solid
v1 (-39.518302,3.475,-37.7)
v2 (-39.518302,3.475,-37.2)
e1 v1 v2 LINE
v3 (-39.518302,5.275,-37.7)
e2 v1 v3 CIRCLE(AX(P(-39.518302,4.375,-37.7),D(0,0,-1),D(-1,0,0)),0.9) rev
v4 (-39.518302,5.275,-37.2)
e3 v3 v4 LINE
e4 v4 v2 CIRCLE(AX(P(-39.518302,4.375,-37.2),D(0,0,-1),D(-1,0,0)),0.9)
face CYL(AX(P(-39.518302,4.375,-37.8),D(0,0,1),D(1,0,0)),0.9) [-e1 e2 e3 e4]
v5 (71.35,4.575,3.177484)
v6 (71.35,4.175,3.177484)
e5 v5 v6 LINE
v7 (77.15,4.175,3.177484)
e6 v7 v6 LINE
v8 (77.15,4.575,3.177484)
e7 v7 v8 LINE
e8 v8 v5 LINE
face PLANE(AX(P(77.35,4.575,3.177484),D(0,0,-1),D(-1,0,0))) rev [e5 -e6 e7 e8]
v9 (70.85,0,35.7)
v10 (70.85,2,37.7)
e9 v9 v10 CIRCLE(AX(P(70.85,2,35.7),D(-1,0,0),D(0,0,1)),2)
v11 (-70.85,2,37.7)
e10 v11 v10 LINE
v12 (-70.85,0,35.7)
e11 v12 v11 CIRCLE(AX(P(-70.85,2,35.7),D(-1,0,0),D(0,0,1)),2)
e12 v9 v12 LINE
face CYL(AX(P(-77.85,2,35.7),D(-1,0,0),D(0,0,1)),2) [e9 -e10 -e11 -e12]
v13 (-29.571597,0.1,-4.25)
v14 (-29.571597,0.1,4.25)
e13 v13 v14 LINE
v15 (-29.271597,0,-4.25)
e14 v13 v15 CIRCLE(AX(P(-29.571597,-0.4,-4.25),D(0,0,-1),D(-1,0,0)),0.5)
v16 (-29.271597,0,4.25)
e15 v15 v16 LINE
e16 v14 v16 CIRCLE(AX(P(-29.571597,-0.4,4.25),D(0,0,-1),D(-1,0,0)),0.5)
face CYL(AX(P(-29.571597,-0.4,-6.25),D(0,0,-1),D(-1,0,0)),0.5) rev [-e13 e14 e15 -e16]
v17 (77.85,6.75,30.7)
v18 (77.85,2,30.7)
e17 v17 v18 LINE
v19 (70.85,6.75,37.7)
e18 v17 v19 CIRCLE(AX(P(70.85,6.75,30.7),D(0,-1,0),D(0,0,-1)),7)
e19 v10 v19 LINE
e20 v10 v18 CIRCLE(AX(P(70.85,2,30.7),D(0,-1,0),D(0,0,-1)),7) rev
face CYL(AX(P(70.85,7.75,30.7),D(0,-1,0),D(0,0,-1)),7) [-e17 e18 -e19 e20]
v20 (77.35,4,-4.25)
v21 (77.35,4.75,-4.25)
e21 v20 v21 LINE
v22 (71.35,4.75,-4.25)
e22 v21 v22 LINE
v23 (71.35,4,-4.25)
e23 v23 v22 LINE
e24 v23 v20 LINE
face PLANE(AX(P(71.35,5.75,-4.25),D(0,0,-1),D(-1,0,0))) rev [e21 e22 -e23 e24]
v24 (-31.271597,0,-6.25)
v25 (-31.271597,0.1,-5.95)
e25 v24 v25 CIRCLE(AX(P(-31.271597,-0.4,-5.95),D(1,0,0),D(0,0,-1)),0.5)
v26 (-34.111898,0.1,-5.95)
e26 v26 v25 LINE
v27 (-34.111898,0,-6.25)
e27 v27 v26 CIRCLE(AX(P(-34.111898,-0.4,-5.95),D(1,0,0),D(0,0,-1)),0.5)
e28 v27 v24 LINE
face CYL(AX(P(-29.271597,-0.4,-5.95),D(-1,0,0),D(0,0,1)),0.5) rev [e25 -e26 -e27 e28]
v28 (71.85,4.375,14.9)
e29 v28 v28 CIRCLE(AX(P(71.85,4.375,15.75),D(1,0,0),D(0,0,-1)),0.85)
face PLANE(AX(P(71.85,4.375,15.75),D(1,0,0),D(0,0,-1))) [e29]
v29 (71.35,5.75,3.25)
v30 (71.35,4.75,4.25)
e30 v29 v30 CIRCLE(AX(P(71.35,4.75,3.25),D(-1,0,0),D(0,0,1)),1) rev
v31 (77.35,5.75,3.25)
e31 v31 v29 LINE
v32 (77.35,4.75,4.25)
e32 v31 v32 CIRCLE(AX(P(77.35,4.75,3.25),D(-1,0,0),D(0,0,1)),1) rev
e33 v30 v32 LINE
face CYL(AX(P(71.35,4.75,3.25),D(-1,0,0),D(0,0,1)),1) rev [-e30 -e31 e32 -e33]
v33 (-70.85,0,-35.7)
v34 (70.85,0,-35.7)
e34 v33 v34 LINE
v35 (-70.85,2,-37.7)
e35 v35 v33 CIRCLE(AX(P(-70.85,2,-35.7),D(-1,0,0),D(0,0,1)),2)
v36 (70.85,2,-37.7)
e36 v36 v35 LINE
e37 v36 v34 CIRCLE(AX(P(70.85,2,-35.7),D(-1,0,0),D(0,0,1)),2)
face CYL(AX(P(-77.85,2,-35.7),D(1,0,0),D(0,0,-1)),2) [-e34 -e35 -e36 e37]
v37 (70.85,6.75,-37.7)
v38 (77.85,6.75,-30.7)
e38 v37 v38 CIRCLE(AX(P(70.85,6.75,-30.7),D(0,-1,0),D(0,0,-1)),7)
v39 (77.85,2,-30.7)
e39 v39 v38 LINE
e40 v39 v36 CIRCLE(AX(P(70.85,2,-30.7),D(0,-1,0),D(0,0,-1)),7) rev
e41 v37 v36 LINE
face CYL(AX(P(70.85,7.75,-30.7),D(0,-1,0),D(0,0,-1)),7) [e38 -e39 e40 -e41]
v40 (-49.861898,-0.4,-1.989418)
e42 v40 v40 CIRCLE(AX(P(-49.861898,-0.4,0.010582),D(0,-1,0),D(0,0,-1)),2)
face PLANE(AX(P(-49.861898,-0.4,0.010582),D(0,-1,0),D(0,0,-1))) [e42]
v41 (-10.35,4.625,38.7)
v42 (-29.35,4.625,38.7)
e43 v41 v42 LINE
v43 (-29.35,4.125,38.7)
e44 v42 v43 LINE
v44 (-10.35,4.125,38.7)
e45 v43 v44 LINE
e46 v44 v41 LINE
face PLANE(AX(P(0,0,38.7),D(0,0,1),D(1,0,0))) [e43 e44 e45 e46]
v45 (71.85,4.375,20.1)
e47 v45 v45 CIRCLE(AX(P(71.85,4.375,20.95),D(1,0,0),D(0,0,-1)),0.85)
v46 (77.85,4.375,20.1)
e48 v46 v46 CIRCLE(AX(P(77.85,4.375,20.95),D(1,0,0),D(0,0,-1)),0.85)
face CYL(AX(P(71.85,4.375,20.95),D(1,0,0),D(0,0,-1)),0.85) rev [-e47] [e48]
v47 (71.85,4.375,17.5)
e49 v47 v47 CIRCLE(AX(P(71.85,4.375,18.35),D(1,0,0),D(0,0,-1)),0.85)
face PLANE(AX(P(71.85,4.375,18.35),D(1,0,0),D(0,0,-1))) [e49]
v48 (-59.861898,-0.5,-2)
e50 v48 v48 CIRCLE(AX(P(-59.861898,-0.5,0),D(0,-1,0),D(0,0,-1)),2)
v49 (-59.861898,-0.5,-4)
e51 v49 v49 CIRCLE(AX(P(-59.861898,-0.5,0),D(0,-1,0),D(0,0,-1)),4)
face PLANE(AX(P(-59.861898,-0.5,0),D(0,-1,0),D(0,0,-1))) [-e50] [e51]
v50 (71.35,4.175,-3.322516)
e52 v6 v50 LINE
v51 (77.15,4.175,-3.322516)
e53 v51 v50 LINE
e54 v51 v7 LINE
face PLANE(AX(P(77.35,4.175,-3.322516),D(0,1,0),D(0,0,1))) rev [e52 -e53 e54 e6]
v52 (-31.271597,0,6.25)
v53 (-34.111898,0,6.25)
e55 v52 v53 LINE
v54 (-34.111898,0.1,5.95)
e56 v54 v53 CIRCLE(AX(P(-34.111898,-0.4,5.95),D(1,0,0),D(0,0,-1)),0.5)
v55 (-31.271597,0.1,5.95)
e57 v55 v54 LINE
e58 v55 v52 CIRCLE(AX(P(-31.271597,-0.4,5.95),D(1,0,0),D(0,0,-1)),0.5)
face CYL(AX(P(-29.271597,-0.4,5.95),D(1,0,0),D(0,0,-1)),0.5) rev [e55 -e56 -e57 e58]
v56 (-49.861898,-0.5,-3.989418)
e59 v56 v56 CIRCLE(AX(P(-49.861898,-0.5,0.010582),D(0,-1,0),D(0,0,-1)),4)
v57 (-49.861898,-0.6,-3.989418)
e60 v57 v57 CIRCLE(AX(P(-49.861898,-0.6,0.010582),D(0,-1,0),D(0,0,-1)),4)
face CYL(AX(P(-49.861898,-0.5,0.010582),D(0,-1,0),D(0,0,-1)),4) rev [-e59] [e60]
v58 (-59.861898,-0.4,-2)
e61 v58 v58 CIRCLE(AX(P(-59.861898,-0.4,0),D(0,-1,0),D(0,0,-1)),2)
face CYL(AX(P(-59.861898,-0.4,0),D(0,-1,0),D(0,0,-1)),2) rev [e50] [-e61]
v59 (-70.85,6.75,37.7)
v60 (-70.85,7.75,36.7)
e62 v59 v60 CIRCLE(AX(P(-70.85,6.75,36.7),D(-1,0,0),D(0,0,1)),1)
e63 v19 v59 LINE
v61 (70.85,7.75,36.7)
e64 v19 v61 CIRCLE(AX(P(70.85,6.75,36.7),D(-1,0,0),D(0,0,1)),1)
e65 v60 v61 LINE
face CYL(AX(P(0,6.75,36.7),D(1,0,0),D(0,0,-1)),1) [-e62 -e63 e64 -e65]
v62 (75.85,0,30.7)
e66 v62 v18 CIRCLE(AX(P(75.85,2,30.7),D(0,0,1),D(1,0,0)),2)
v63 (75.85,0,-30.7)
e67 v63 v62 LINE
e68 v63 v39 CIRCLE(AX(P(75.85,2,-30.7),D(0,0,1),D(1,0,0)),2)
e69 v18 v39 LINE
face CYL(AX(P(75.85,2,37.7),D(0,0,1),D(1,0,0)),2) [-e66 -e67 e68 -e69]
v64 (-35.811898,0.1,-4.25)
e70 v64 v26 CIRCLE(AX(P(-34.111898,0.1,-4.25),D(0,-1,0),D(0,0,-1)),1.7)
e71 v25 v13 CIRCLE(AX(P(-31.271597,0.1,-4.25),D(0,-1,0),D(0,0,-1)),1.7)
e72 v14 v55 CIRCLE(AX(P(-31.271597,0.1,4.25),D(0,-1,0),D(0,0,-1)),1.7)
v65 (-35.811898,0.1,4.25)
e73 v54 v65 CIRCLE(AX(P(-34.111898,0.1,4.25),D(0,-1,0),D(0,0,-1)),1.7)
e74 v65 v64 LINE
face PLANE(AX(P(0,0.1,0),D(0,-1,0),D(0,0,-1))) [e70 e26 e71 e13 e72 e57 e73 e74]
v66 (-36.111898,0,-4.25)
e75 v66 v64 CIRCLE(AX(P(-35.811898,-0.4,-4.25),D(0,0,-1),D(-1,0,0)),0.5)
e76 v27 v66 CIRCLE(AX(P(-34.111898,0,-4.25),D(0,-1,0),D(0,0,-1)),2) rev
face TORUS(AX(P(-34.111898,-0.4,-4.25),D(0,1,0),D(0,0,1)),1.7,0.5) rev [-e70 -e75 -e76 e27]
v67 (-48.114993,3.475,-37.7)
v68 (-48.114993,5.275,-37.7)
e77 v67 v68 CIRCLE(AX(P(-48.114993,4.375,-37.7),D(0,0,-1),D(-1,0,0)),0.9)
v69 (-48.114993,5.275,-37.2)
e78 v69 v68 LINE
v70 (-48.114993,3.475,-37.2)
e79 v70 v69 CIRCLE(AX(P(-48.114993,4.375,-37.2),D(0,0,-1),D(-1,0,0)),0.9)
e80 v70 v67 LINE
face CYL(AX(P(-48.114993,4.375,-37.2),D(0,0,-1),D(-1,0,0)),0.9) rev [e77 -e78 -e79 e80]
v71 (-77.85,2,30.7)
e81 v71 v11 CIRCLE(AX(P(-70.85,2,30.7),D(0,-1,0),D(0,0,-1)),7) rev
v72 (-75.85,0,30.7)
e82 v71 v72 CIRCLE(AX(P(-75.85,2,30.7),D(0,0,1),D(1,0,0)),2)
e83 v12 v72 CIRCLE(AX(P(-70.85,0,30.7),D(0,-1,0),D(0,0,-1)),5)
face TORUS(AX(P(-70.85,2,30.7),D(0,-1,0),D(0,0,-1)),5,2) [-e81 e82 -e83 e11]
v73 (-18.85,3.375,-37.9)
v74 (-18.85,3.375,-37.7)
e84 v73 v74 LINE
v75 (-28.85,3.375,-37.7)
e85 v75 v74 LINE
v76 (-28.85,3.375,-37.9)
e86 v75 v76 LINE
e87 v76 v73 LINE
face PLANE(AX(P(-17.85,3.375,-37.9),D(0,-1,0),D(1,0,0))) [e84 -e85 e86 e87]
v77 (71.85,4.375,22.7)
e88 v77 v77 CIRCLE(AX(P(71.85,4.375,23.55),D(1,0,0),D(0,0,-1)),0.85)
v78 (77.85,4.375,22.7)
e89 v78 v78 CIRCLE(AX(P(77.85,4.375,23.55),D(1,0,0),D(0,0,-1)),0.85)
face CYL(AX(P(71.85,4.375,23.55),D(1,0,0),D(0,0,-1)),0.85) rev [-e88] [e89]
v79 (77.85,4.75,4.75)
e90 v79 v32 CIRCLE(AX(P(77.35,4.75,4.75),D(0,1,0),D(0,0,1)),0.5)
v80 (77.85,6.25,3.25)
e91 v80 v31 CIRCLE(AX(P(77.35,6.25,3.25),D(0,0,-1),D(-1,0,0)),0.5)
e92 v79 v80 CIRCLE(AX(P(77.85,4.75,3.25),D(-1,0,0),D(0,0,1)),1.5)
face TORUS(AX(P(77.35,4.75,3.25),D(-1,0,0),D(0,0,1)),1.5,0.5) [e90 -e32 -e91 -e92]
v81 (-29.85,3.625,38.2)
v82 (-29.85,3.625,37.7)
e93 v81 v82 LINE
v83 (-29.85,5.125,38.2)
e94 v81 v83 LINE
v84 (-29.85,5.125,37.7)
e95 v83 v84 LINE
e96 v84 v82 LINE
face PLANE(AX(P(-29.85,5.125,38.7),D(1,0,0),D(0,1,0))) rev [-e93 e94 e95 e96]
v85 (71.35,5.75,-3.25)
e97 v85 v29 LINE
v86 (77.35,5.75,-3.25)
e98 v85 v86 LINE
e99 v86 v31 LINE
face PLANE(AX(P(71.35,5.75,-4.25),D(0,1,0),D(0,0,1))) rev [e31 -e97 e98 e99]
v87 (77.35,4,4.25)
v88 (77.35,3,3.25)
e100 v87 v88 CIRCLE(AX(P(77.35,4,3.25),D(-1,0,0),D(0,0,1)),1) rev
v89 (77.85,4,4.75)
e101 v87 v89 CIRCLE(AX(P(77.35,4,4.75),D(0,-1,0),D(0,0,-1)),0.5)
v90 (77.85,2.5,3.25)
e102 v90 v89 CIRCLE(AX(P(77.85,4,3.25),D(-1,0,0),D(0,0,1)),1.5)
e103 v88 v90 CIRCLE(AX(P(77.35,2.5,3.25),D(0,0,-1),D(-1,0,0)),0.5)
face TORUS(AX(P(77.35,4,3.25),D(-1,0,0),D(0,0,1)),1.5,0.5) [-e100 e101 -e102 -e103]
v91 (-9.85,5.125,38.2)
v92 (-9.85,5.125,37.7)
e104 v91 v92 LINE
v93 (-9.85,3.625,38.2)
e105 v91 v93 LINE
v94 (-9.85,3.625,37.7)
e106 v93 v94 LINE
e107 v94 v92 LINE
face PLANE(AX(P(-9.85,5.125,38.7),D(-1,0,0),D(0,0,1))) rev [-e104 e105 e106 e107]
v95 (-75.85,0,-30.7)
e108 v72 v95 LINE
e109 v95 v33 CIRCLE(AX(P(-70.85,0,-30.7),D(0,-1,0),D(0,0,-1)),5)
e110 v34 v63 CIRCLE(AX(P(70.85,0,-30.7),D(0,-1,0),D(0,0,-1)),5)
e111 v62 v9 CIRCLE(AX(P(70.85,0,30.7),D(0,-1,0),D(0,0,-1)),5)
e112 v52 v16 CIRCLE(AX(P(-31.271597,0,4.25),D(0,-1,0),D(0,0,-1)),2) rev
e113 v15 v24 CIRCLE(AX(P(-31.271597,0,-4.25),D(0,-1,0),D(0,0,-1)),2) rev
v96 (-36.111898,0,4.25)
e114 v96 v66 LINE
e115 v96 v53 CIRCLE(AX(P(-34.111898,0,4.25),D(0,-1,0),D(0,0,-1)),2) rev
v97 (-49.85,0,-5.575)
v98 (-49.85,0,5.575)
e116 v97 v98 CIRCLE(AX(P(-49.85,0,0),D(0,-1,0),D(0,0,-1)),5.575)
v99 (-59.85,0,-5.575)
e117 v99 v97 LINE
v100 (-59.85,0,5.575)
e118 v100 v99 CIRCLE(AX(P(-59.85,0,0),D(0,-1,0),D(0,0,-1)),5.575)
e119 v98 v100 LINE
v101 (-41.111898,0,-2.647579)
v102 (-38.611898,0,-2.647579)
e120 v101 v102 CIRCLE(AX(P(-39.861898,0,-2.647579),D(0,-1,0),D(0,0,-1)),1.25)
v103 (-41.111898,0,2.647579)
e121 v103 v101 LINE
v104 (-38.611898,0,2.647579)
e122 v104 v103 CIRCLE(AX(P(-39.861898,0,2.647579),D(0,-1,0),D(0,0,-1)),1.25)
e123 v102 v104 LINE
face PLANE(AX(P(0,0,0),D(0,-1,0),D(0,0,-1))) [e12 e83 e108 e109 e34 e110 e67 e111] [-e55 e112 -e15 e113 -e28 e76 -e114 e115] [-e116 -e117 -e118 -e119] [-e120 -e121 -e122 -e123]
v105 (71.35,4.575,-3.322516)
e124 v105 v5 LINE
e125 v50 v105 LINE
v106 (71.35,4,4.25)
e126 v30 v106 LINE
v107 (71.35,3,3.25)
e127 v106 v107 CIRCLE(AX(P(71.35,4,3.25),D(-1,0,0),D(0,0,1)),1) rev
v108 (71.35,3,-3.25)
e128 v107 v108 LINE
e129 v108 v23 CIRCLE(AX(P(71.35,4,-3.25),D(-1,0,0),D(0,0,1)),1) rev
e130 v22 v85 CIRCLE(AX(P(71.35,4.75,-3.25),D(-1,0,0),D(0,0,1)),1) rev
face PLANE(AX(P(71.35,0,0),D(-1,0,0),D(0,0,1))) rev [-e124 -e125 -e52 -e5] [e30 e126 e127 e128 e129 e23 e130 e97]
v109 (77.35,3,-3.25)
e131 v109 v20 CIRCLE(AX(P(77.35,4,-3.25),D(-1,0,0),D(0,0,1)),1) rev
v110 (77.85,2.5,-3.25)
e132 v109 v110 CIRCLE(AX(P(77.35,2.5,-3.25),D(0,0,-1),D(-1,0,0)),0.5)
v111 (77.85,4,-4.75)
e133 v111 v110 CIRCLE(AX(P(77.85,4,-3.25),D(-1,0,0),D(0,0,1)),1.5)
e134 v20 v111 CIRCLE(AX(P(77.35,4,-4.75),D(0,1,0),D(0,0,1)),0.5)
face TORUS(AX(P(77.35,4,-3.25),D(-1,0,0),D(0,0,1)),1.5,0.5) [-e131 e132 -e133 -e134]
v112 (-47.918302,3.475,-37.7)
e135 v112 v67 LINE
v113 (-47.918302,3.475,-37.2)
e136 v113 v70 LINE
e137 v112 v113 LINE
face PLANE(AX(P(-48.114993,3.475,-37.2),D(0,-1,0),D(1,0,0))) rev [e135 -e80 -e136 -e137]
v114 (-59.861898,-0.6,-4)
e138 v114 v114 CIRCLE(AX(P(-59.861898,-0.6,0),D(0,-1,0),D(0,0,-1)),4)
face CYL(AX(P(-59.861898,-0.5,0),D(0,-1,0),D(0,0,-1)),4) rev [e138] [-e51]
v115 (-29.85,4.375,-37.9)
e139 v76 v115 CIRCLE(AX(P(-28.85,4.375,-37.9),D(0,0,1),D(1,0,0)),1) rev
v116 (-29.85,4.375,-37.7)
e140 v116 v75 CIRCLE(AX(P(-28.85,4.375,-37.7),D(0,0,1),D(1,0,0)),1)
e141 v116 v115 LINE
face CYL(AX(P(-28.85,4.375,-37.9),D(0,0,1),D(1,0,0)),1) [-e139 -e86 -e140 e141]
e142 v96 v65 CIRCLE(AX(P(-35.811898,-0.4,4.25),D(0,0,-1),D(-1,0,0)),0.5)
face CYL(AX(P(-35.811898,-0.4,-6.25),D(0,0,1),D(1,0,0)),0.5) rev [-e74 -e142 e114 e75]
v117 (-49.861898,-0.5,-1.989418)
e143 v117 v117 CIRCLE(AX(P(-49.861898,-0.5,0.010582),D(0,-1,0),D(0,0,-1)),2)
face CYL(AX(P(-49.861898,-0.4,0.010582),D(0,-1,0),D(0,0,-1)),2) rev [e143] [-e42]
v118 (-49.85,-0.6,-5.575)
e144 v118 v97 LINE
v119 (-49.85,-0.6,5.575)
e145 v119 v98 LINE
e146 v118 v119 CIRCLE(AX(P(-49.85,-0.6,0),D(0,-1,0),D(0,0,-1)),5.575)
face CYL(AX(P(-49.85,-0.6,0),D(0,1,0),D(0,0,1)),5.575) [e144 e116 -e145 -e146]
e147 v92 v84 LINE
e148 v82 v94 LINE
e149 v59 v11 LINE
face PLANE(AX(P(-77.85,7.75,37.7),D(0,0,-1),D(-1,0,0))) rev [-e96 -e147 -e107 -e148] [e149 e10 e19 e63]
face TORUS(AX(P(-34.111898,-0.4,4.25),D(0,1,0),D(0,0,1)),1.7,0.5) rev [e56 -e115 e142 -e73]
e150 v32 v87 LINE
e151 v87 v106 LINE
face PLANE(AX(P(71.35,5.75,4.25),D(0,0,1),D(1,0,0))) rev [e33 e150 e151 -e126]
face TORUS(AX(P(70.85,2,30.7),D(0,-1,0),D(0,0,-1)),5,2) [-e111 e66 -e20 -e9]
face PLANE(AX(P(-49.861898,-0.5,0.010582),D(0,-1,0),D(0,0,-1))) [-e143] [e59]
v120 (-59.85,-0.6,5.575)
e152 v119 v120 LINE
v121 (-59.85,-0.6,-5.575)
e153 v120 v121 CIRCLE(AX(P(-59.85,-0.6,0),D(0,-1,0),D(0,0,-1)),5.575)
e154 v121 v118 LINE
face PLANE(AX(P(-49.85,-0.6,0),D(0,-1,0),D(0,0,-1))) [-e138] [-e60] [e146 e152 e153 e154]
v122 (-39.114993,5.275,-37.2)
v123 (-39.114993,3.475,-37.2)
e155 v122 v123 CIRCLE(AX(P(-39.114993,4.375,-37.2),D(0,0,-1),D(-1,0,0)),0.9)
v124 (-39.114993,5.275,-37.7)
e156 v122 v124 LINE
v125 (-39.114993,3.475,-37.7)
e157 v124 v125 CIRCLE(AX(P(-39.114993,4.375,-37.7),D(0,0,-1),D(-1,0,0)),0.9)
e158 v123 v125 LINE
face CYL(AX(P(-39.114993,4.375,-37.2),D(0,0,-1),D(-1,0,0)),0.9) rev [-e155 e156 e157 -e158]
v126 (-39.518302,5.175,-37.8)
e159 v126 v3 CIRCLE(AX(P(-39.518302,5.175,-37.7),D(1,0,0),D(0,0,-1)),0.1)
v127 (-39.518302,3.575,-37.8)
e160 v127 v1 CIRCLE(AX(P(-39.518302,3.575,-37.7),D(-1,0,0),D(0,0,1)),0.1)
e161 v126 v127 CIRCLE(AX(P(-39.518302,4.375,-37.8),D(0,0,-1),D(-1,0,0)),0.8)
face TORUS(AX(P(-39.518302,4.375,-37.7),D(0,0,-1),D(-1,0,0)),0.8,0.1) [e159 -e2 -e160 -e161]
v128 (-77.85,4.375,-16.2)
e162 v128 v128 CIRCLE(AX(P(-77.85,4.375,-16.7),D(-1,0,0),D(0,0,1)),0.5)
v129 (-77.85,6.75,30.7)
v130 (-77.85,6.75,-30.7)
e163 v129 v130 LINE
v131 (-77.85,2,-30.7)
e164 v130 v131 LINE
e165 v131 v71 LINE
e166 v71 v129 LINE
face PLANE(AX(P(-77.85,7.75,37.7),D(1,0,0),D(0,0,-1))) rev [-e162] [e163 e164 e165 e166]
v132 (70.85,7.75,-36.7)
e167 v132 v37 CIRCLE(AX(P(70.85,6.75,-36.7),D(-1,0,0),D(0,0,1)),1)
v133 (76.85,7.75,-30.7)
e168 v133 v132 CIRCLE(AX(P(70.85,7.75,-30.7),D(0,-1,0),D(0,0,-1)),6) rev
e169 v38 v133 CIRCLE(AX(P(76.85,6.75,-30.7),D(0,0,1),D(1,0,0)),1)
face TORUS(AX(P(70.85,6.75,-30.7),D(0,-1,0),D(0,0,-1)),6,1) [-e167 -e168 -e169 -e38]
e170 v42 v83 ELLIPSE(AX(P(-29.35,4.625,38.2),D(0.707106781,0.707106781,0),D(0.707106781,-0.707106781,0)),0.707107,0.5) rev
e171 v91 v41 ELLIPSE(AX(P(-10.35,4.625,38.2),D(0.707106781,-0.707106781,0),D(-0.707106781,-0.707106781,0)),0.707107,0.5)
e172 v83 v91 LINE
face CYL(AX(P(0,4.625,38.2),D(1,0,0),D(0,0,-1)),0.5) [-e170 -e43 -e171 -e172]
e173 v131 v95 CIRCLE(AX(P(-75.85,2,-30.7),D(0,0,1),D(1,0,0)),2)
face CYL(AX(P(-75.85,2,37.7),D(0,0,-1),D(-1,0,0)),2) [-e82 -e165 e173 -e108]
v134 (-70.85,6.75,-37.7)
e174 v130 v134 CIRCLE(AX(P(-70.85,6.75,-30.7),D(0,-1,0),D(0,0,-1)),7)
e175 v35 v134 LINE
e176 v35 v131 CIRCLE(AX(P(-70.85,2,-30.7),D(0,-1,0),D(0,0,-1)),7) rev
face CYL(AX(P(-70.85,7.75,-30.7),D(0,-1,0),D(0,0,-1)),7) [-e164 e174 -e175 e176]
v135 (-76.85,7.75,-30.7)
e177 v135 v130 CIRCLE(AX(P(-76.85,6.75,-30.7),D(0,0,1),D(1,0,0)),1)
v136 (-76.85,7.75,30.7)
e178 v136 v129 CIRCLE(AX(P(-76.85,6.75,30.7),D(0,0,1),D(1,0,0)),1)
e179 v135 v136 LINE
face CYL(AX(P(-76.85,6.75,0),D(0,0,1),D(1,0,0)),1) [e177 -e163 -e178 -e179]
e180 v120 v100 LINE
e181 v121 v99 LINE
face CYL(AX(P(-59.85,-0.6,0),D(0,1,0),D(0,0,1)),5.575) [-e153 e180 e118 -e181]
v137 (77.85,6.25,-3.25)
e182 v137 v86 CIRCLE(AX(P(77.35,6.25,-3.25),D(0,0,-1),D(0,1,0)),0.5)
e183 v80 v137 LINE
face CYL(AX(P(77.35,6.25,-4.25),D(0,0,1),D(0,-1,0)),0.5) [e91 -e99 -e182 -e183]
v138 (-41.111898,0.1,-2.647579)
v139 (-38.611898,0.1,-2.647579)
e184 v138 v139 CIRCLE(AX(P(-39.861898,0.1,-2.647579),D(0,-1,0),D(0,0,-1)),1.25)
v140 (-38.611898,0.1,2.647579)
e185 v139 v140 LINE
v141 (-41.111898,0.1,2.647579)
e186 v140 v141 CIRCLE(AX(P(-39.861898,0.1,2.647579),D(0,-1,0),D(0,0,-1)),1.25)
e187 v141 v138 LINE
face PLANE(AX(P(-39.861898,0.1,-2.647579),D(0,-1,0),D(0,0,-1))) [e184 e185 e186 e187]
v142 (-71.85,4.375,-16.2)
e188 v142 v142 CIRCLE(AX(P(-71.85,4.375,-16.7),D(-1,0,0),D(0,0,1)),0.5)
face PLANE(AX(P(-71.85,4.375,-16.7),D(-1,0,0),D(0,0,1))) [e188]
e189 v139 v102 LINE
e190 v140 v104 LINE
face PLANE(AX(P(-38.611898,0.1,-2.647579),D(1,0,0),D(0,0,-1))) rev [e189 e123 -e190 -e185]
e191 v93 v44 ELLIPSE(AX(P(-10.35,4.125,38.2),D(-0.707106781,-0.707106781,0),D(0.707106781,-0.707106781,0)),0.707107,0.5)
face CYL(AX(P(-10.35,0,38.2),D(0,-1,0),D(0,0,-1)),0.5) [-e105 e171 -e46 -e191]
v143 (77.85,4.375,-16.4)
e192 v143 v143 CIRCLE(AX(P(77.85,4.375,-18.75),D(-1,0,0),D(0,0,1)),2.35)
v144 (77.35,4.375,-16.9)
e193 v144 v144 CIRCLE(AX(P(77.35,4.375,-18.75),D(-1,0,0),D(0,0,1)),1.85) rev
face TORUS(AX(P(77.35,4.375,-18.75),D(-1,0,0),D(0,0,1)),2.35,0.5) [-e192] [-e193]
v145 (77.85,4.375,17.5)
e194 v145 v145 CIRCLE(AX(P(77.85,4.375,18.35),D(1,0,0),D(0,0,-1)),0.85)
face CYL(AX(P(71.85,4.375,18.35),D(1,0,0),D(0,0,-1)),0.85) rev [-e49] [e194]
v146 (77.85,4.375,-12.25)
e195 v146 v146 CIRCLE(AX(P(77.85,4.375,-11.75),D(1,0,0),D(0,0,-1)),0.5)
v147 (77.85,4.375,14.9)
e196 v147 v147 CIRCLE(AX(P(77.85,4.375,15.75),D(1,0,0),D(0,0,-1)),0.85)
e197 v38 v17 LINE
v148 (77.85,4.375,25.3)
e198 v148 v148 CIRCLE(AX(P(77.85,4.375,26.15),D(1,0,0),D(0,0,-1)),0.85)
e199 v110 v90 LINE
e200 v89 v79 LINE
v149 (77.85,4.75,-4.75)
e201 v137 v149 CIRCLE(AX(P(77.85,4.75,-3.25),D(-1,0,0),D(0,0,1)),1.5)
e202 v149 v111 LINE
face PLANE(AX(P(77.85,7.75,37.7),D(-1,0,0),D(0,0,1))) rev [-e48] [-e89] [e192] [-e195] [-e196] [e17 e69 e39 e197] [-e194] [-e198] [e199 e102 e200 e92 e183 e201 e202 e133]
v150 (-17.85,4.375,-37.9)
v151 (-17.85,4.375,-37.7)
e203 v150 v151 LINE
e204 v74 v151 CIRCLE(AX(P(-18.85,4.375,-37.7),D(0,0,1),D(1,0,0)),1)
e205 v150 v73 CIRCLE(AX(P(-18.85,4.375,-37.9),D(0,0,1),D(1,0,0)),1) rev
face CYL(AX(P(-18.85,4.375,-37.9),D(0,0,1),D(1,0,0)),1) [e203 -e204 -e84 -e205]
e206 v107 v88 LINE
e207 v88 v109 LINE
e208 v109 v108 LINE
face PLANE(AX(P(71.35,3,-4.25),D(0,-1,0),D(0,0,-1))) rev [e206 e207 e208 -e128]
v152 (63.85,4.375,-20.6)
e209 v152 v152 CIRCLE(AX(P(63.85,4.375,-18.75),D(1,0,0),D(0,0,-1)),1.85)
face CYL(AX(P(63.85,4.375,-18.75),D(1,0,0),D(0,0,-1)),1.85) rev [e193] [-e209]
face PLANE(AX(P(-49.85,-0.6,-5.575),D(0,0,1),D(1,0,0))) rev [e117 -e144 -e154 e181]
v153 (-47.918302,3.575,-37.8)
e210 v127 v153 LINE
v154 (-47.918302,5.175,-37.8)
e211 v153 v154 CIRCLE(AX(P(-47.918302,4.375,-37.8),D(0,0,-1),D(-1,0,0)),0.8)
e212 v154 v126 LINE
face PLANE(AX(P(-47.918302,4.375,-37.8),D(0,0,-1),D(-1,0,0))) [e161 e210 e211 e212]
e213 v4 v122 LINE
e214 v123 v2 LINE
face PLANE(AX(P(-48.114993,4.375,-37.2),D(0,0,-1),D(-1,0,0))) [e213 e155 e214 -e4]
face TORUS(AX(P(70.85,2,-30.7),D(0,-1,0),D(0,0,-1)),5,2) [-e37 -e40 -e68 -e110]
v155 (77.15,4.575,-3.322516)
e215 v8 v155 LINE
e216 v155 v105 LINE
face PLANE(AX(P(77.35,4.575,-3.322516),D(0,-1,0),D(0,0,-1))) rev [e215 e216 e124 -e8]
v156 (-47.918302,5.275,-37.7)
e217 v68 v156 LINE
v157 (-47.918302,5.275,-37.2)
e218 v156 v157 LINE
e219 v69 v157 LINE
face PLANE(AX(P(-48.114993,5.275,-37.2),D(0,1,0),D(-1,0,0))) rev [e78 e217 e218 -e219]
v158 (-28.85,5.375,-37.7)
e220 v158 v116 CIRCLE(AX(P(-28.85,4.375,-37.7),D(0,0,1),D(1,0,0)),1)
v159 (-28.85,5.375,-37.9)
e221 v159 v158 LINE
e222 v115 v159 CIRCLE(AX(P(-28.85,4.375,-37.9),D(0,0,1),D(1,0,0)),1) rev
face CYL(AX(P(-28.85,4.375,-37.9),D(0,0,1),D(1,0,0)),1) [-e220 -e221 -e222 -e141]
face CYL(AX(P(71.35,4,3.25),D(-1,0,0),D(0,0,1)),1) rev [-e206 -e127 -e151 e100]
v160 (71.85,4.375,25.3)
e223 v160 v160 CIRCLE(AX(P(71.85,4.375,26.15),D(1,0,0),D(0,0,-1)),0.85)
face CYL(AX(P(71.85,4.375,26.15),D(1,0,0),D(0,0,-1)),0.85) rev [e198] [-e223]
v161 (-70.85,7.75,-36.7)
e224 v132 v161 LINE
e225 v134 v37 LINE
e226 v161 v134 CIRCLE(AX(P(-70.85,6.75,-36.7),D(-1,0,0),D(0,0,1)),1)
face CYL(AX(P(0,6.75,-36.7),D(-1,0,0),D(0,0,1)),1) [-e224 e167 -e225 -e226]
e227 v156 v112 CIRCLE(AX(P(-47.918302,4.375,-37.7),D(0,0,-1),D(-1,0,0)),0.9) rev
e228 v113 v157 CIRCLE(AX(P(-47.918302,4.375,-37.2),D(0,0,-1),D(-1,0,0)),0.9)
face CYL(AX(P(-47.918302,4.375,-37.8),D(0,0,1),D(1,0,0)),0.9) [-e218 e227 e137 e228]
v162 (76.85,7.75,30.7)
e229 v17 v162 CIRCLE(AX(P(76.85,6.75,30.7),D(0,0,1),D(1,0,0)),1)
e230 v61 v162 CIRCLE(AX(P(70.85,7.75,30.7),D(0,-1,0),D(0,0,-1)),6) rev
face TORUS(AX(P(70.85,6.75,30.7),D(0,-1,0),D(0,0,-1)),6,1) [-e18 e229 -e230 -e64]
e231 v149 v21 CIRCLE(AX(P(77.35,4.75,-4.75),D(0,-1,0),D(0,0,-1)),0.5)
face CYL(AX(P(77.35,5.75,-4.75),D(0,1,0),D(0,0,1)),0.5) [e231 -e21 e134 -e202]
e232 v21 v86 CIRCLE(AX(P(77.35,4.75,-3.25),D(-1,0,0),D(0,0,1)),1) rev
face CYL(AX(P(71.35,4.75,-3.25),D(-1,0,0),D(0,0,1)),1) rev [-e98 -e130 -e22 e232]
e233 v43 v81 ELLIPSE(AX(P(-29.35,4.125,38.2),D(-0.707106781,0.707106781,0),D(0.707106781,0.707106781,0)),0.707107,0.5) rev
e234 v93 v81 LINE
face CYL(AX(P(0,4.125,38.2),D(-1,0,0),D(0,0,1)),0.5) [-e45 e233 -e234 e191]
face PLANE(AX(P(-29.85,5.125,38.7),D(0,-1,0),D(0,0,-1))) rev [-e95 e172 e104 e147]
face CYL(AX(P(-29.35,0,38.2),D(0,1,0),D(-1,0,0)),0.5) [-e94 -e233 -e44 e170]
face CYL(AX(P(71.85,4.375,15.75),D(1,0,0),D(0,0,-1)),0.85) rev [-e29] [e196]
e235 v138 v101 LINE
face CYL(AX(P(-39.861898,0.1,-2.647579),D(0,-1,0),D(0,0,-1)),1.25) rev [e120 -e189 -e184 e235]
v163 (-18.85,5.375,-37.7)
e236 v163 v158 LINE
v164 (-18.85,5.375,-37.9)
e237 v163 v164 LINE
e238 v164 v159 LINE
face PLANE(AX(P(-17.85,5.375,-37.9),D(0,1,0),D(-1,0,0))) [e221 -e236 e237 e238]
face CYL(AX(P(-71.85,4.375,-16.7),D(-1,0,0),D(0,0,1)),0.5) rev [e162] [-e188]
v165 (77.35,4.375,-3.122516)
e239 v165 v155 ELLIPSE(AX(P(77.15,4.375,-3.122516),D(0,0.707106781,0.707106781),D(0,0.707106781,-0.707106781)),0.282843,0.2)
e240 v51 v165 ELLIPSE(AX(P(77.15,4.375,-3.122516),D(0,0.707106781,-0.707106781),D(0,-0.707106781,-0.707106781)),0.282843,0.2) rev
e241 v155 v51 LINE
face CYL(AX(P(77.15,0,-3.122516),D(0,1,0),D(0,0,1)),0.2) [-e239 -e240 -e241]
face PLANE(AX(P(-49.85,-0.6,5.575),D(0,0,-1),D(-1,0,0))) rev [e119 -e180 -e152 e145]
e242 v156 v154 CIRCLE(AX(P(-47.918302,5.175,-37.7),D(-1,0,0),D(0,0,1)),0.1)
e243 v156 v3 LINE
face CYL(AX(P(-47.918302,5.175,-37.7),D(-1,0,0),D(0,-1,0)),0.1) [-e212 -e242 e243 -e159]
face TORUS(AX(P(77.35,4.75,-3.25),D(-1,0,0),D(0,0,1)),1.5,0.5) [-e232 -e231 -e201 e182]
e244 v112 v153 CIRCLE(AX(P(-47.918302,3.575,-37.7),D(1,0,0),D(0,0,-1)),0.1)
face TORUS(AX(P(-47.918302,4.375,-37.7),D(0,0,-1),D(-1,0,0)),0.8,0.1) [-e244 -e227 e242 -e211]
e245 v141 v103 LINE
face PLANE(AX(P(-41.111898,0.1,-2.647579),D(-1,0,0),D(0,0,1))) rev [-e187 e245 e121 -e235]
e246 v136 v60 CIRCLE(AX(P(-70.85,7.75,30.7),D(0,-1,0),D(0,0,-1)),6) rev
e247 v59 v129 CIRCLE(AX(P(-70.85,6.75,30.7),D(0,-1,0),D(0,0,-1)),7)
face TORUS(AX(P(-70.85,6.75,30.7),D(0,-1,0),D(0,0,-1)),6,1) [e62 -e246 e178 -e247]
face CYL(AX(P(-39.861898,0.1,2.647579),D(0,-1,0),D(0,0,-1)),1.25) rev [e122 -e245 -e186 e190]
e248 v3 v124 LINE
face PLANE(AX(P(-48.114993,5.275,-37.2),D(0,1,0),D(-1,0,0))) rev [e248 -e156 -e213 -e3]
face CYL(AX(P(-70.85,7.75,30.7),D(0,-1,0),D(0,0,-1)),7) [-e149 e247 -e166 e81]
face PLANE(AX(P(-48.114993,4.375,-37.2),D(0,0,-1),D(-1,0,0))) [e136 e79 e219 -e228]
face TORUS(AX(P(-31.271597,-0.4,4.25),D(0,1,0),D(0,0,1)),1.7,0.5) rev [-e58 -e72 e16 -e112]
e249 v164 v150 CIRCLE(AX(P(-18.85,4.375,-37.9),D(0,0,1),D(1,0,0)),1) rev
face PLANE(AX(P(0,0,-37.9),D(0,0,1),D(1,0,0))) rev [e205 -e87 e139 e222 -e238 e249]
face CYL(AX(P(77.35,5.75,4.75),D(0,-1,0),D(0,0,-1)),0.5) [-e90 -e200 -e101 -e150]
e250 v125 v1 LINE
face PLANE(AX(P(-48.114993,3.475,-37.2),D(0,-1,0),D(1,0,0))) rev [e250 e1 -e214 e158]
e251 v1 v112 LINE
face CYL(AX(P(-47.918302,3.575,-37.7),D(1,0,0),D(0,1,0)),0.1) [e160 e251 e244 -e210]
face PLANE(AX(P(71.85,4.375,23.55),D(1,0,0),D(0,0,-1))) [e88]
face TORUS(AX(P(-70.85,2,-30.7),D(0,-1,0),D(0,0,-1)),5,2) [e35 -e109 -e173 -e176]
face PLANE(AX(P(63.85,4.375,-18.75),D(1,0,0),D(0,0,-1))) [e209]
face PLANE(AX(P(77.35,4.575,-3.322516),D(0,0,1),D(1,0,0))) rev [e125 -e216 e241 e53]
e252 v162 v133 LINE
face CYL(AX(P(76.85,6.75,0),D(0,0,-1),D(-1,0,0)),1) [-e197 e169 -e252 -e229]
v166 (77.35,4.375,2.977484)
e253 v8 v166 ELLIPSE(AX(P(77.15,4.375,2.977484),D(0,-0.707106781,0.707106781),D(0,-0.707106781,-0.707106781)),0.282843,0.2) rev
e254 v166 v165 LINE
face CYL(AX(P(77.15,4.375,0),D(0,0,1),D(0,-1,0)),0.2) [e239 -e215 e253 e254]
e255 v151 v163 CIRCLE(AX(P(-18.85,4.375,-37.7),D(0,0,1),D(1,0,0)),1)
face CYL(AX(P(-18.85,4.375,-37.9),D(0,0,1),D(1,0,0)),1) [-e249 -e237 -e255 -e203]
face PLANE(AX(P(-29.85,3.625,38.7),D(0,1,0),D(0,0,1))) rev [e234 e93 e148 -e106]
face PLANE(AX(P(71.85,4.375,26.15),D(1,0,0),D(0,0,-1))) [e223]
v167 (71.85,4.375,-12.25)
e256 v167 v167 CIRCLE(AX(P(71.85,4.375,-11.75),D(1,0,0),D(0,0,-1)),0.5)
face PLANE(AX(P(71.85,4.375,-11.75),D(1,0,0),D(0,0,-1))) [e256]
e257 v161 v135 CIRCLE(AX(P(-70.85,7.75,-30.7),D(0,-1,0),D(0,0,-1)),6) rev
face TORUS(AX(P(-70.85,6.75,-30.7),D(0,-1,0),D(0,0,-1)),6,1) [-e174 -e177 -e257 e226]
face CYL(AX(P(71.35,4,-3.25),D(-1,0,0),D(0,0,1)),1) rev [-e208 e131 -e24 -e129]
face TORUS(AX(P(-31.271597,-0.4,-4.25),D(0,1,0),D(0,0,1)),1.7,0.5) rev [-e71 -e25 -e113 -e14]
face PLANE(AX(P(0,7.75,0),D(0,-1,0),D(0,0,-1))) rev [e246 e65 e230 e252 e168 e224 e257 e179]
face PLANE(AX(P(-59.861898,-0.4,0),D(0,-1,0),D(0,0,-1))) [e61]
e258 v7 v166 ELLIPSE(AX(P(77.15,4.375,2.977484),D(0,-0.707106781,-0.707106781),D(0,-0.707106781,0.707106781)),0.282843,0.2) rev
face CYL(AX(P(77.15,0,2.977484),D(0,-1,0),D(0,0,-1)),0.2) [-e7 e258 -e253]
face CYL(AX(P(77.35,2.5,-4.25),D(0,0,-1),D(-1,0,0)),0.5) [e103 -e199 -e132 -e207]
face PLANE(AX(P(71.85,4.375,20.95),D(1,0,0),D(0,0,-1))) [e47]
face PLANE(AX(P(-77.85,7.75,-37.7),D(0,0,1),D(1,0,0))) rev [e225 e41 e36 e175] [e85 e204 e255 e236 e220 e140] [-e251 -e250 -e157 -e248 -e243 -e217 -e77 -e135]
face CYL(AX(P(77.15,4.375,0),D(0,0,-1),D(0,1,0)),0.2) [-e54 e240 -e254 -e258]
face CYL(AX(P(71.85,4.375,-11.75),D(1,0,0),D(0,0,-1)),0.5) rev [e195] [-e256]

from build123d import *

# Parameters (mm, degrees)
SKETCH1_W                = 155.7
SKETCH1_H                = 75.4
BOSS_EXTRUDE1_DEPTH      = 7.75
FILLET1_R                = 7
FILLET2_R                = 1
FILLET3_R                = 2
BOSS_EXTRUDE2_DEPTH      = 0.6
SKETCH3_R                = 4
CUT_EXTRUDE1_DEPTH       = 0.1
SKETCH4_R                = 2
CUT_EXTRUDE2_DEPTH       = 0.1
CUT_EXTRUDE3_DEPTH       = 0.1
SKETCH6_W                = 6.840301521
SKETCH6_H                = 12.5
CUT_EXTRUDE4_DEPTH       = 0.1
FILLET4_R                = 2
FILLET5_R                = 0.5
BOSS_EXTRUDE3_DEPTH      = 0.2
BOSS_EXTRUDE3_DEPTH_BACK = 0.2
SKETCH7_W                = 12
SKETCH7_H                = 2
FILLET6_R                = 1
CUT_EXTRUDE5_DEPTH       = 0.5
BOSS_EXTRUDE4_DEPTH      = 0.6
FILLET7_R                = 0.1
SKETCH11_W               = 8.5
SKETCH11_H               = 2.75
CUT_EXTRUDE6_DEPTH       = 6.5
FILLET8_R                = 1
SKETCH12_W               = 6.5
SKETCH12_H               = 0.4
BOSS_EXTRUDE5_DEPTH      = 6
FILLET9_R                = 0.5
SKETCH13_R               = 0.85
CUT_EXTRUDE7_DEPTH       = 6
SKETCH14_R               = 1.85
CUT_EXTRUDE8_DEPTH       = 14
FILLET10_R               = 0.5
FILLET12_R               = 0.2
SKETCH15_R               = 0.5
CUT_EXTRUDE9_DEPTH       = 6
SKETCH16_R               = 0.5
CUT_EXTRUDE10_DEPTH      = 6
SKETCH18_W               = 20
SKETCH18_H               = 1.5
BOSS_EXTRUDE6_DEPTH      = 1
FILLET13_R               = 0.5


# Some blends are built 0.0001 mm under size
with BuildPart() as part:
    # Sketch1 → Boss-Extrude1 (new body)
    with BuildSketch(Plane(origin=(0, 0, 0), x_dir=(1, 0, 0), z_dir=(0, 1, 0))):
        Rectangle(SKETCH1_W, SKETCH1_H)
    extrude(amount=BOSS_EXTRUDE1_DEPTH)

    # Fillet1
    fillet1_edges = [part.edges().sort_by_distance(p)[0] for p in [
        (77.85, 3.875, 37.7),
        (-77.85, 3.875, 37.7),
        (-77.85, 3.875, -37.7),
        (77.85, 3.875, -37.7),
    ]]
    fillet(fillet1_edges, radius=FILLET1_R)

    # Fillet2
    fillet2_edges = [part.edges().sort_by_distance(p)[0] for p in [
        (-77.85, 7.75, 0),
        (0, 7.75, -37.7),
        (77.85, 7.75, 0),
        (0, 7.75, 37.7),
        (-75.799747468, 7.75, 35.649747468),
        (75.799747468, 7.75, 35.649747468),
        (75.799747468, 7.75, -35.649747468),
        (-75.799747468, 7.75, -35.649747468),
    ]]
    fillet(fillet2_edges, radius=FILLET2_R)

    # Fillet3
    fillet3_edges = [part.edges().sort_by_distance(p)[0] for p in [
        (-77.85, 0, 0),
        (77.85, 0, 0),
        (0, 0, 37.7),
        (0, 0, -37.7),
        (-75.799747468, 0, 35.649747468),
        (75.799747468, 0, 35.649747468),
        (75.799747468, 0, -35.649747468),
        (-75.799747468, 0, -35.649747468),
    ]]
    fillet(fillet3_edges, radius=FILLET3_R)

    # Sketch2 → Boss-Extrude2 (add)
    with BuildSketch(Plane.XZ):
        with BuildLine():
            Line((-49.85, -5.575), (-59.85, -5.575))
            ThreePointArc((-59.85, -5.575), (-65.425, 0), (-59.85, 5.575))
            Line((-59.85, 5.575), (-49.85, 5.575))
            ThreePointArc((-49.85, 5.575), (-44.275, 0), (-49.85, -5.575))
        make_face()
    extrude(amount=BOSS_EXTRUDE2_DEPTH)

    # Sketch3 → Cut-Extrude1 (cut)
    with BuildSketch(Plane.XZ.offset(0.6)):
        with Locations(Location((-49.86189839, 0.010581739, 0), (0, 0, 270))):
            Circle(SKETCH3_R)
        with Locations(Location((-59.86189839, 0, 0), (0, 0, 270))):
            Circle(SKETCH3_R)
    extrude(amount=-CUT_EXTRUDE1_DEPTH, mode=Mode.SUBTRACT)

    # Sketch4 → Cut-Extrude2 (cut)
    with BuildSketch(Plane.XZ.offset(0.5)):
        with Locations(Location((-49.86189839, 0.010581739, 0), (0, 0, 270))):
            Circle(SKETCH4_R)
        with Locations(Location((-59.86189839, 0, 0), (0, 0, 270))):
            Circle(SKETCH4_R)
    extrude(amount=-CUT_EXTRUDE2_DEPTH, mode=Mode.SUBTRACT)

    # Sketch5 → Cut-Extrude3 (cut)
    with BuildSketch(Plane.XZ):
        with BuildLine():
            Line((-41.11189839, -2.647579151), (-41.11189839, 2.647579151))
            ThreePointArc((-41.11189839, 2.647579151), (-39.86189839, 3.897579151), (-38.61189839, 2.647579151))
            Line((-38.61189839, 2.647579151), (-38.61189839, -2.647579151))
            ThreePointArc((-38.61189839, -2.647579151), (-39.86189839, -3.897579151), (-41.11189839, -2.647579151))
        make_face()
    extrude(amount=-CUT_EXTRUDE3_DEPTH, mode=Mode.SUBTRACT)

    # Sketch6 → Cut-Extrude4 (cut)
    with BuildSketch(Plane.XZ):
        with Locations((-32.69174763, 0)):
            Rectangle(SKETCH6_W, SKETCH6_H)
    extrude(amount=-CUT_EXTRUDE4_DEPTH, mode=Mode.SUBTRACT)

    # Fillet4
    fillet4_edges = [part.edges().sort_by_distance(p)[0] for p in [
        (-36.11189839, 0.05, -6.25),
        (-36.11189839, 0.05, 6.25),
        (-29.271596869, 0.05, 6.25),
        (-29.271596869, 0.05, -6.25),
    ]]
    fillet(fillet4_edges, radius=FILLET4_R)

    # Fillet5
    # the kernel refuses this fillet: 0.5 mm, written as the material it adds along each edge
    with BuildSketch(Plane(origin=(-34.11189839, 0.1, 4.25), x_dir=(-1, 0, 0), z_dir=(0, 0, -1))) as fillet5_piece_1:
        with BuildLine():
            CenterArc((1.7, -0.5), FILLET5_R, 53.130102354, 36.869897646)
            Line((1.7, 0), (1.7, 0.01))
            Line((1.7, 0.01), (2, 0.01))
            Line((2, 0.01), (2.01, 0))
            ThreePointArc((2.01, 0), (2.01, -0.05), (2.006, -0.092))
            Line((2.006, -0.092), (2, -0.1))
        make_face()
    revolve(axis=Axis((-34.11189839, 0.1, 4.25), (0, 1, 0)), revolution_arc=90)
    with BuildSketch(Plane(origin=(-34.11189839, 0.1, 6.25), x_dir=(0, -1, 0), z_dir=(1, 0, 0)), Plane(origin=(-31.271596869, 0.1, -6.25), x_dir=(0, -1, 0), z_dir=(-1, 0, 0))) as fillet5_piece_2:
        with BuildLine():
            CenterArc((0.5, 0.3), FILLET5_R, 180, 36.869897646)
            Line((0, 0.3), (-0.01, 0.3))
            Line((-0.01, 0.3), (-0.01, 0))
            Line((-0.01, 0), (0, -0.01))
            ThreePointArc((0, -0.01), (0.05, -0.01), (0.092, -0.006))
            Line((0.092, -0.006), (0.1, 0))
        make_face()
    extrude(amount=2.84030152)
    with BuildSketch(Plane(origin=(-31.271596869, 0.1, 4.25), x_dir=(0, 0, 1), z_dir=(-1, 0, 0))) as fillet5_piece_3:
        with BuildLine():
            CenterArc((1.7, -0.5), FILLET5_R, 53.130102354, 36.869897646)
            Line((1.7, 0), (1.7, 0.01))
            Line((1.7, 0.01), (2, 0.01))
            Line((2, 0.01), (2.01, 0))
            ThreePointArc((2.01, 0), (2.01, -0.05), (2.006, -0.092))
            Line((2.006, -0.092), (2, -0.1))
        make_face()
    revolve(axis=Axis((-31.271596869, 0.1, 4.25), (0, 1, 0)), revolution_arc=90)
    with BuildSketch(Plane(origin=(-29.271596869, 0.1, 4.25), x_dir=(0, -1, 0), z_dir=(0, 0, -1)), Plane(origin=(-36.11189839, 0.1, -4.25), x_dir=(0, -1, 0), z_dir=(0, 0, 1))) as fillet5_piece_4:
        with BuildLine():
            CenterArc((0.5, 0.3), FILLET5_R, 180, 36.869897646)
            Line((0, 0.3), (-0.01, 0.3))
            Line((-0.01, 0.3), (-0.01, 0))
            Line((-0.01, 0), (0, -0.01))
            ThreePointArc((0, -0.01), (0.05, -0.01), (0.092, -0.006))
            Line((0.092, -0.006), (0.1, 0))
        make_face()
    extrude(amount=8.5)
    with BuildSketch(Plane(origin=(-31.271596869, 0.1, -4.25), x_dir=(0, 0, -1), z_dir=(-1, 0, 0))) as fillet5_piece_5:
        with BuildLine():
            CenterArc((1.7, 0.5), FILLET5_R, 270, 36.869897646)
            Line((1.7, 0), (1.7, -0.01))
            Line((1.7, -0.01), (2, -0.01))
            Line((2, -0.01), (2.01, 0))
            ThreePointArc((2.01, 0), (2.01, 0.05), (2.006, 0.092))
            Line((2.006, 0.092), (2, 0.1))
        make_face()
    revolve(axis=Axis((-31.271596869, 0.1, -4.25), (0, -1, 0)), revolution_arc=90)
    with BuildSketch(Plane(origin=(-34.11189839, 0.1, -4.25), x_dir=(0, 0, -1), z_dir=(1, 0, 0))) as fillet5_piece_6:
        with BuildLine():
            CenterArc((1.7, -0.5), FILLET5_R, 53.130102354, 36.869897646)
            Line((1.7, 0), (1.7, 0.01))
            Line((1.7, 0.01), (2, 0.01))
            Line((2, 0.01), (2.01, 0))
            ThreePointArc((2.01, 0), (2.01, -0.05), (2.006, -0.092))
            Line((2.006, -0.092), (2, -0.1))
        make_face()
    revolve(axis=Axis((-34.11189839, 0.1, -4.25), (0, 1, 0)), revolution_arc=90)

    # Sketch7 → Boss-Extrude3 (add, two sides: drawn at the far end of the back side and taken through both)
    with BuildSketch(Plane.XY.offset(-37.7).offset(-BOSS_EXTRUDE3_DEPTH_BACK)):
        with Locations((-23.85, 4.375)):
            Rectangle(SKETCH7_W, SKETCH7_H)
    extrude(amount=BOSS_EXTRUDE3_DEPTH + BOSS_EXTRUDE3_DEPTH_BACK)

    # Fillet6
    fillet6_edges = [part.edges().sort_by_distance(p)[0] for p in [
        (-17.85, 3.375, -37.8),
        (-17.85, 5.375, -37.8),
        (-29.85, 3.375, -37.8),
        (-29.85, 5.375, -37.8),
    ]]
    fillet(fillet6_edges, radius=FILLET6_R - 0.0001)  # a hair under: the kernel refuses the full size

    # Sketch8 → Cut-Extrude5 (cut)
    with BuildSketch(Plane(origin=(0, 0, -37.7), x_dir=(-1, 0, 0), z_dir=(0, 0, -1))):
        with BuildLine():
            Line((48.114993193, 3.475), (39.114993193, 3.475))
            ThreePointArc((39.114993193, 3.475), (38.214993193, 4.375), (39.114993193, 5.275))
            Line((39.114993193, 5.275), (48.114993193, 5.275))
            ThreePointArc((48.114993193, 5.275), (49.014993193, 4.375), (48.114993193, 3.475))
        make_face()
    extrude(amount=-CUT_EXTRUDE5_DEPTH, mode=Mode.SUBTRACT)

    # Sketch9 → Boss-Extrude4 (add)
    with BuildSketch(Plane(origin=(0, 0, -37.2), x_dir=(-1, 0, 0), z_dir=(0, 0, -1))):
        with BuildLine():
            Line((47.918302414, 3.475), (39.518302414, 3.475))
            ThreePointArc((39.518302414, 3.475), (38.618302414, 4.375), (39.518302414, 5.275))
            Line((39.518302414, 5.275), (47.918302414, 5.275))
            ThreePointArc((47.918302414, 5.275), (48.818302414, 4.375), (47.918302414, 3.475))
        make_face()
    extrude(amount=BOSS_EXTRUDE4_DEPTH)

    # Fillet7
    fillet7_edges = [part.edges().sort_by_distance(p)[0] for p in [
        (-43.718302414, 3.475, -37.8),
        (-38.618302414, 4.375, -37.8),
        (-43.718302414, 5.275, -37.8),
        (-48.818302414, 4.375, -37.8),
    ]]
    fillet(fillet7_edges, radius=FILLET7_R - 0.0001)  # a hair under: the kernel refuses the full size

    # Sketch11 → Cut-Extrude6 (cut)
    with BuildSketch(Plane(origin=(77.85, 0, 0), x_dir=(0, 0, -1), z_dir=(1, 0, 0))):
        with Locations((0, 4.375)):
            Rectangle(SKETCH11_W, SKETCH11_H)
    extrude(amount=-CUT_EXTRUDE6_DEPTH, mode=Mode.SUBTRACT)

    # Fillet8
    fillet8_edges = [part.edges().sort_by_distance(p)[0] for p in [
        (74.6, 3, 4.25),
        (74.6, 5.75, 4.25),
        (74.6, 5.75, -4.25),
        (74.6, 3, -4.25),
    ]]
    fillet(fillet8_edges, radius=FILLET8_R)

    # Sketch12 → Boss-Extrude5 (add)
    with BuildSketch(Plane(origin=(71.35, 0, 0), x_dir=(0, 0, -1), z_dir=(1, 0, 0))):
        with Locations((0.072516481, 4.375)):
            Rectangle(SKETCH12_W, SKETCH12_H)
    extrude(amount=BOSS_EXTRUDE5_DEPTH)

    # Fillet9
    fillet9_edges = [part.edges().sort_by_distance(p)[0] for p in [
        (77.85, 4.375, 4.25),
        (77.85, 5.75, 0),
        (77.85, 4.375, -4.25),
        (77.85, 3, 0),
        (77.85, 5.457106781, 3.957106781),
        (77.85, 5.457106781, -3.957106781),
        (77.85, 3.292893219, 3.957106781),
        (77.85, 3.292893219, -3.957106781),
    ]]
    fillet(fillet9_edges, radius=FILLET9_R)

    # Sketch13 → Cut-Extrude7 (cut)
    with BuildSketch(Plane(origin=(77.85, 0, 0), x_dir=(0, 0, -1), z_dir=(1, 0, 0))):
        with Locations((-15.75, 4.375)):
            Circle(SKETCH13_R)
        with Locations((-18.35, 4.375)):
            Circle(SKETCH13_R)
        with Locations((-20.95, 4.375)):
            Circle(SKETCH13_R)
        with Locations((-23.55, 4.375)):
            Circle(SKETCH13_R)
        with Locations((-26.15, 4.375)):
            Circle(SKETCH13_R)
    extrude(amount=-CUT_EXTRUDE7_DEPTH, mode=Mode.SUBTRACT)

    # Sketch14 → Cut-Extrude8 (cut)
    with BuildSketch(Plane(origin=(77.85, 0, 0), x_dir=(0, 0, -1), z_dir=(1, 0, 0))):
        with Locations((18.75, 4.375)):
            Circle(SKETCH14_R)
    extrude(amount=-CUT_EXTRUDE8_DEPTH, mode=Mode.SUBTRACT)

    # Fillet10
    fillet10_edges = [part.edges().sort_by_distance(p)[0] for p in [
        (77.85, 4.375, -16.9),
    ]]
    fillet(fillet10_edges, radius=FILLET10_R)

    # Fillet12
    fillet12_edges = [part.edges().sort_by_distance(p)[0] for p in [
        (77.35, 4.375, 3.177483519),
        (77.35, 4.175, -0.072516481),
        (77.35, 4.375, -3.322516481),
        (77.35, 4.575, -0.072516481),
    ]]
    fillet(fillet12_edges, radius=FILLET12_R - 0.0001)  # a hair under: the kernel refuses the full size

    # Sketch15 → Cut-Extrude9 (cut)
    with BuildSketch(Plane(origin=(77.85, 0, 0), x_dir=(0, 0, -1), z_dir=(1, 0, 0))):
        with Locations((11.75, 4.375)):
            Circle(SKETCH15_R)
    extrude(amount=-CUT_EXTRUDE9_DEPTH, mode=Mode.SUBTRACT)

    # Sketch16 → Cut-Extrude10 (cut)
    with BuildSketch(Plane.ZY.offset(77.85)):
        with Locations((-16.7, 4.375)):
            Circle(SKETCH16_R)
    extrude(amount=-CUT_EXTRUDE10_DEPTH, mode=Mode.SUBTRACT)

    # Sketch18 → Boss-Extrude6 (add)
    with BuildSketch(Plane.XY.offset(37.7)):
        with Locations((-19.85, 4.375)):
            Rectangle(SKETCH18_W, SKETCH18_H)
    extrude(amount=BOSS_EXTRUDE6_DEPTH)

    # Fillet13
    fillet13_edges = [part.edges().sort_by_distance(p)[0] for p in [
        (-9.85, 4.375, 38.7),
        (-19.85, 5.125, 38.7),
        (-29.85, 4.375, 38.7),
        (-19.85, 3.625, 38.7),
    ]]
    fillet(fillet13_edges, radius=FILLET13_R)


solid = part.part
